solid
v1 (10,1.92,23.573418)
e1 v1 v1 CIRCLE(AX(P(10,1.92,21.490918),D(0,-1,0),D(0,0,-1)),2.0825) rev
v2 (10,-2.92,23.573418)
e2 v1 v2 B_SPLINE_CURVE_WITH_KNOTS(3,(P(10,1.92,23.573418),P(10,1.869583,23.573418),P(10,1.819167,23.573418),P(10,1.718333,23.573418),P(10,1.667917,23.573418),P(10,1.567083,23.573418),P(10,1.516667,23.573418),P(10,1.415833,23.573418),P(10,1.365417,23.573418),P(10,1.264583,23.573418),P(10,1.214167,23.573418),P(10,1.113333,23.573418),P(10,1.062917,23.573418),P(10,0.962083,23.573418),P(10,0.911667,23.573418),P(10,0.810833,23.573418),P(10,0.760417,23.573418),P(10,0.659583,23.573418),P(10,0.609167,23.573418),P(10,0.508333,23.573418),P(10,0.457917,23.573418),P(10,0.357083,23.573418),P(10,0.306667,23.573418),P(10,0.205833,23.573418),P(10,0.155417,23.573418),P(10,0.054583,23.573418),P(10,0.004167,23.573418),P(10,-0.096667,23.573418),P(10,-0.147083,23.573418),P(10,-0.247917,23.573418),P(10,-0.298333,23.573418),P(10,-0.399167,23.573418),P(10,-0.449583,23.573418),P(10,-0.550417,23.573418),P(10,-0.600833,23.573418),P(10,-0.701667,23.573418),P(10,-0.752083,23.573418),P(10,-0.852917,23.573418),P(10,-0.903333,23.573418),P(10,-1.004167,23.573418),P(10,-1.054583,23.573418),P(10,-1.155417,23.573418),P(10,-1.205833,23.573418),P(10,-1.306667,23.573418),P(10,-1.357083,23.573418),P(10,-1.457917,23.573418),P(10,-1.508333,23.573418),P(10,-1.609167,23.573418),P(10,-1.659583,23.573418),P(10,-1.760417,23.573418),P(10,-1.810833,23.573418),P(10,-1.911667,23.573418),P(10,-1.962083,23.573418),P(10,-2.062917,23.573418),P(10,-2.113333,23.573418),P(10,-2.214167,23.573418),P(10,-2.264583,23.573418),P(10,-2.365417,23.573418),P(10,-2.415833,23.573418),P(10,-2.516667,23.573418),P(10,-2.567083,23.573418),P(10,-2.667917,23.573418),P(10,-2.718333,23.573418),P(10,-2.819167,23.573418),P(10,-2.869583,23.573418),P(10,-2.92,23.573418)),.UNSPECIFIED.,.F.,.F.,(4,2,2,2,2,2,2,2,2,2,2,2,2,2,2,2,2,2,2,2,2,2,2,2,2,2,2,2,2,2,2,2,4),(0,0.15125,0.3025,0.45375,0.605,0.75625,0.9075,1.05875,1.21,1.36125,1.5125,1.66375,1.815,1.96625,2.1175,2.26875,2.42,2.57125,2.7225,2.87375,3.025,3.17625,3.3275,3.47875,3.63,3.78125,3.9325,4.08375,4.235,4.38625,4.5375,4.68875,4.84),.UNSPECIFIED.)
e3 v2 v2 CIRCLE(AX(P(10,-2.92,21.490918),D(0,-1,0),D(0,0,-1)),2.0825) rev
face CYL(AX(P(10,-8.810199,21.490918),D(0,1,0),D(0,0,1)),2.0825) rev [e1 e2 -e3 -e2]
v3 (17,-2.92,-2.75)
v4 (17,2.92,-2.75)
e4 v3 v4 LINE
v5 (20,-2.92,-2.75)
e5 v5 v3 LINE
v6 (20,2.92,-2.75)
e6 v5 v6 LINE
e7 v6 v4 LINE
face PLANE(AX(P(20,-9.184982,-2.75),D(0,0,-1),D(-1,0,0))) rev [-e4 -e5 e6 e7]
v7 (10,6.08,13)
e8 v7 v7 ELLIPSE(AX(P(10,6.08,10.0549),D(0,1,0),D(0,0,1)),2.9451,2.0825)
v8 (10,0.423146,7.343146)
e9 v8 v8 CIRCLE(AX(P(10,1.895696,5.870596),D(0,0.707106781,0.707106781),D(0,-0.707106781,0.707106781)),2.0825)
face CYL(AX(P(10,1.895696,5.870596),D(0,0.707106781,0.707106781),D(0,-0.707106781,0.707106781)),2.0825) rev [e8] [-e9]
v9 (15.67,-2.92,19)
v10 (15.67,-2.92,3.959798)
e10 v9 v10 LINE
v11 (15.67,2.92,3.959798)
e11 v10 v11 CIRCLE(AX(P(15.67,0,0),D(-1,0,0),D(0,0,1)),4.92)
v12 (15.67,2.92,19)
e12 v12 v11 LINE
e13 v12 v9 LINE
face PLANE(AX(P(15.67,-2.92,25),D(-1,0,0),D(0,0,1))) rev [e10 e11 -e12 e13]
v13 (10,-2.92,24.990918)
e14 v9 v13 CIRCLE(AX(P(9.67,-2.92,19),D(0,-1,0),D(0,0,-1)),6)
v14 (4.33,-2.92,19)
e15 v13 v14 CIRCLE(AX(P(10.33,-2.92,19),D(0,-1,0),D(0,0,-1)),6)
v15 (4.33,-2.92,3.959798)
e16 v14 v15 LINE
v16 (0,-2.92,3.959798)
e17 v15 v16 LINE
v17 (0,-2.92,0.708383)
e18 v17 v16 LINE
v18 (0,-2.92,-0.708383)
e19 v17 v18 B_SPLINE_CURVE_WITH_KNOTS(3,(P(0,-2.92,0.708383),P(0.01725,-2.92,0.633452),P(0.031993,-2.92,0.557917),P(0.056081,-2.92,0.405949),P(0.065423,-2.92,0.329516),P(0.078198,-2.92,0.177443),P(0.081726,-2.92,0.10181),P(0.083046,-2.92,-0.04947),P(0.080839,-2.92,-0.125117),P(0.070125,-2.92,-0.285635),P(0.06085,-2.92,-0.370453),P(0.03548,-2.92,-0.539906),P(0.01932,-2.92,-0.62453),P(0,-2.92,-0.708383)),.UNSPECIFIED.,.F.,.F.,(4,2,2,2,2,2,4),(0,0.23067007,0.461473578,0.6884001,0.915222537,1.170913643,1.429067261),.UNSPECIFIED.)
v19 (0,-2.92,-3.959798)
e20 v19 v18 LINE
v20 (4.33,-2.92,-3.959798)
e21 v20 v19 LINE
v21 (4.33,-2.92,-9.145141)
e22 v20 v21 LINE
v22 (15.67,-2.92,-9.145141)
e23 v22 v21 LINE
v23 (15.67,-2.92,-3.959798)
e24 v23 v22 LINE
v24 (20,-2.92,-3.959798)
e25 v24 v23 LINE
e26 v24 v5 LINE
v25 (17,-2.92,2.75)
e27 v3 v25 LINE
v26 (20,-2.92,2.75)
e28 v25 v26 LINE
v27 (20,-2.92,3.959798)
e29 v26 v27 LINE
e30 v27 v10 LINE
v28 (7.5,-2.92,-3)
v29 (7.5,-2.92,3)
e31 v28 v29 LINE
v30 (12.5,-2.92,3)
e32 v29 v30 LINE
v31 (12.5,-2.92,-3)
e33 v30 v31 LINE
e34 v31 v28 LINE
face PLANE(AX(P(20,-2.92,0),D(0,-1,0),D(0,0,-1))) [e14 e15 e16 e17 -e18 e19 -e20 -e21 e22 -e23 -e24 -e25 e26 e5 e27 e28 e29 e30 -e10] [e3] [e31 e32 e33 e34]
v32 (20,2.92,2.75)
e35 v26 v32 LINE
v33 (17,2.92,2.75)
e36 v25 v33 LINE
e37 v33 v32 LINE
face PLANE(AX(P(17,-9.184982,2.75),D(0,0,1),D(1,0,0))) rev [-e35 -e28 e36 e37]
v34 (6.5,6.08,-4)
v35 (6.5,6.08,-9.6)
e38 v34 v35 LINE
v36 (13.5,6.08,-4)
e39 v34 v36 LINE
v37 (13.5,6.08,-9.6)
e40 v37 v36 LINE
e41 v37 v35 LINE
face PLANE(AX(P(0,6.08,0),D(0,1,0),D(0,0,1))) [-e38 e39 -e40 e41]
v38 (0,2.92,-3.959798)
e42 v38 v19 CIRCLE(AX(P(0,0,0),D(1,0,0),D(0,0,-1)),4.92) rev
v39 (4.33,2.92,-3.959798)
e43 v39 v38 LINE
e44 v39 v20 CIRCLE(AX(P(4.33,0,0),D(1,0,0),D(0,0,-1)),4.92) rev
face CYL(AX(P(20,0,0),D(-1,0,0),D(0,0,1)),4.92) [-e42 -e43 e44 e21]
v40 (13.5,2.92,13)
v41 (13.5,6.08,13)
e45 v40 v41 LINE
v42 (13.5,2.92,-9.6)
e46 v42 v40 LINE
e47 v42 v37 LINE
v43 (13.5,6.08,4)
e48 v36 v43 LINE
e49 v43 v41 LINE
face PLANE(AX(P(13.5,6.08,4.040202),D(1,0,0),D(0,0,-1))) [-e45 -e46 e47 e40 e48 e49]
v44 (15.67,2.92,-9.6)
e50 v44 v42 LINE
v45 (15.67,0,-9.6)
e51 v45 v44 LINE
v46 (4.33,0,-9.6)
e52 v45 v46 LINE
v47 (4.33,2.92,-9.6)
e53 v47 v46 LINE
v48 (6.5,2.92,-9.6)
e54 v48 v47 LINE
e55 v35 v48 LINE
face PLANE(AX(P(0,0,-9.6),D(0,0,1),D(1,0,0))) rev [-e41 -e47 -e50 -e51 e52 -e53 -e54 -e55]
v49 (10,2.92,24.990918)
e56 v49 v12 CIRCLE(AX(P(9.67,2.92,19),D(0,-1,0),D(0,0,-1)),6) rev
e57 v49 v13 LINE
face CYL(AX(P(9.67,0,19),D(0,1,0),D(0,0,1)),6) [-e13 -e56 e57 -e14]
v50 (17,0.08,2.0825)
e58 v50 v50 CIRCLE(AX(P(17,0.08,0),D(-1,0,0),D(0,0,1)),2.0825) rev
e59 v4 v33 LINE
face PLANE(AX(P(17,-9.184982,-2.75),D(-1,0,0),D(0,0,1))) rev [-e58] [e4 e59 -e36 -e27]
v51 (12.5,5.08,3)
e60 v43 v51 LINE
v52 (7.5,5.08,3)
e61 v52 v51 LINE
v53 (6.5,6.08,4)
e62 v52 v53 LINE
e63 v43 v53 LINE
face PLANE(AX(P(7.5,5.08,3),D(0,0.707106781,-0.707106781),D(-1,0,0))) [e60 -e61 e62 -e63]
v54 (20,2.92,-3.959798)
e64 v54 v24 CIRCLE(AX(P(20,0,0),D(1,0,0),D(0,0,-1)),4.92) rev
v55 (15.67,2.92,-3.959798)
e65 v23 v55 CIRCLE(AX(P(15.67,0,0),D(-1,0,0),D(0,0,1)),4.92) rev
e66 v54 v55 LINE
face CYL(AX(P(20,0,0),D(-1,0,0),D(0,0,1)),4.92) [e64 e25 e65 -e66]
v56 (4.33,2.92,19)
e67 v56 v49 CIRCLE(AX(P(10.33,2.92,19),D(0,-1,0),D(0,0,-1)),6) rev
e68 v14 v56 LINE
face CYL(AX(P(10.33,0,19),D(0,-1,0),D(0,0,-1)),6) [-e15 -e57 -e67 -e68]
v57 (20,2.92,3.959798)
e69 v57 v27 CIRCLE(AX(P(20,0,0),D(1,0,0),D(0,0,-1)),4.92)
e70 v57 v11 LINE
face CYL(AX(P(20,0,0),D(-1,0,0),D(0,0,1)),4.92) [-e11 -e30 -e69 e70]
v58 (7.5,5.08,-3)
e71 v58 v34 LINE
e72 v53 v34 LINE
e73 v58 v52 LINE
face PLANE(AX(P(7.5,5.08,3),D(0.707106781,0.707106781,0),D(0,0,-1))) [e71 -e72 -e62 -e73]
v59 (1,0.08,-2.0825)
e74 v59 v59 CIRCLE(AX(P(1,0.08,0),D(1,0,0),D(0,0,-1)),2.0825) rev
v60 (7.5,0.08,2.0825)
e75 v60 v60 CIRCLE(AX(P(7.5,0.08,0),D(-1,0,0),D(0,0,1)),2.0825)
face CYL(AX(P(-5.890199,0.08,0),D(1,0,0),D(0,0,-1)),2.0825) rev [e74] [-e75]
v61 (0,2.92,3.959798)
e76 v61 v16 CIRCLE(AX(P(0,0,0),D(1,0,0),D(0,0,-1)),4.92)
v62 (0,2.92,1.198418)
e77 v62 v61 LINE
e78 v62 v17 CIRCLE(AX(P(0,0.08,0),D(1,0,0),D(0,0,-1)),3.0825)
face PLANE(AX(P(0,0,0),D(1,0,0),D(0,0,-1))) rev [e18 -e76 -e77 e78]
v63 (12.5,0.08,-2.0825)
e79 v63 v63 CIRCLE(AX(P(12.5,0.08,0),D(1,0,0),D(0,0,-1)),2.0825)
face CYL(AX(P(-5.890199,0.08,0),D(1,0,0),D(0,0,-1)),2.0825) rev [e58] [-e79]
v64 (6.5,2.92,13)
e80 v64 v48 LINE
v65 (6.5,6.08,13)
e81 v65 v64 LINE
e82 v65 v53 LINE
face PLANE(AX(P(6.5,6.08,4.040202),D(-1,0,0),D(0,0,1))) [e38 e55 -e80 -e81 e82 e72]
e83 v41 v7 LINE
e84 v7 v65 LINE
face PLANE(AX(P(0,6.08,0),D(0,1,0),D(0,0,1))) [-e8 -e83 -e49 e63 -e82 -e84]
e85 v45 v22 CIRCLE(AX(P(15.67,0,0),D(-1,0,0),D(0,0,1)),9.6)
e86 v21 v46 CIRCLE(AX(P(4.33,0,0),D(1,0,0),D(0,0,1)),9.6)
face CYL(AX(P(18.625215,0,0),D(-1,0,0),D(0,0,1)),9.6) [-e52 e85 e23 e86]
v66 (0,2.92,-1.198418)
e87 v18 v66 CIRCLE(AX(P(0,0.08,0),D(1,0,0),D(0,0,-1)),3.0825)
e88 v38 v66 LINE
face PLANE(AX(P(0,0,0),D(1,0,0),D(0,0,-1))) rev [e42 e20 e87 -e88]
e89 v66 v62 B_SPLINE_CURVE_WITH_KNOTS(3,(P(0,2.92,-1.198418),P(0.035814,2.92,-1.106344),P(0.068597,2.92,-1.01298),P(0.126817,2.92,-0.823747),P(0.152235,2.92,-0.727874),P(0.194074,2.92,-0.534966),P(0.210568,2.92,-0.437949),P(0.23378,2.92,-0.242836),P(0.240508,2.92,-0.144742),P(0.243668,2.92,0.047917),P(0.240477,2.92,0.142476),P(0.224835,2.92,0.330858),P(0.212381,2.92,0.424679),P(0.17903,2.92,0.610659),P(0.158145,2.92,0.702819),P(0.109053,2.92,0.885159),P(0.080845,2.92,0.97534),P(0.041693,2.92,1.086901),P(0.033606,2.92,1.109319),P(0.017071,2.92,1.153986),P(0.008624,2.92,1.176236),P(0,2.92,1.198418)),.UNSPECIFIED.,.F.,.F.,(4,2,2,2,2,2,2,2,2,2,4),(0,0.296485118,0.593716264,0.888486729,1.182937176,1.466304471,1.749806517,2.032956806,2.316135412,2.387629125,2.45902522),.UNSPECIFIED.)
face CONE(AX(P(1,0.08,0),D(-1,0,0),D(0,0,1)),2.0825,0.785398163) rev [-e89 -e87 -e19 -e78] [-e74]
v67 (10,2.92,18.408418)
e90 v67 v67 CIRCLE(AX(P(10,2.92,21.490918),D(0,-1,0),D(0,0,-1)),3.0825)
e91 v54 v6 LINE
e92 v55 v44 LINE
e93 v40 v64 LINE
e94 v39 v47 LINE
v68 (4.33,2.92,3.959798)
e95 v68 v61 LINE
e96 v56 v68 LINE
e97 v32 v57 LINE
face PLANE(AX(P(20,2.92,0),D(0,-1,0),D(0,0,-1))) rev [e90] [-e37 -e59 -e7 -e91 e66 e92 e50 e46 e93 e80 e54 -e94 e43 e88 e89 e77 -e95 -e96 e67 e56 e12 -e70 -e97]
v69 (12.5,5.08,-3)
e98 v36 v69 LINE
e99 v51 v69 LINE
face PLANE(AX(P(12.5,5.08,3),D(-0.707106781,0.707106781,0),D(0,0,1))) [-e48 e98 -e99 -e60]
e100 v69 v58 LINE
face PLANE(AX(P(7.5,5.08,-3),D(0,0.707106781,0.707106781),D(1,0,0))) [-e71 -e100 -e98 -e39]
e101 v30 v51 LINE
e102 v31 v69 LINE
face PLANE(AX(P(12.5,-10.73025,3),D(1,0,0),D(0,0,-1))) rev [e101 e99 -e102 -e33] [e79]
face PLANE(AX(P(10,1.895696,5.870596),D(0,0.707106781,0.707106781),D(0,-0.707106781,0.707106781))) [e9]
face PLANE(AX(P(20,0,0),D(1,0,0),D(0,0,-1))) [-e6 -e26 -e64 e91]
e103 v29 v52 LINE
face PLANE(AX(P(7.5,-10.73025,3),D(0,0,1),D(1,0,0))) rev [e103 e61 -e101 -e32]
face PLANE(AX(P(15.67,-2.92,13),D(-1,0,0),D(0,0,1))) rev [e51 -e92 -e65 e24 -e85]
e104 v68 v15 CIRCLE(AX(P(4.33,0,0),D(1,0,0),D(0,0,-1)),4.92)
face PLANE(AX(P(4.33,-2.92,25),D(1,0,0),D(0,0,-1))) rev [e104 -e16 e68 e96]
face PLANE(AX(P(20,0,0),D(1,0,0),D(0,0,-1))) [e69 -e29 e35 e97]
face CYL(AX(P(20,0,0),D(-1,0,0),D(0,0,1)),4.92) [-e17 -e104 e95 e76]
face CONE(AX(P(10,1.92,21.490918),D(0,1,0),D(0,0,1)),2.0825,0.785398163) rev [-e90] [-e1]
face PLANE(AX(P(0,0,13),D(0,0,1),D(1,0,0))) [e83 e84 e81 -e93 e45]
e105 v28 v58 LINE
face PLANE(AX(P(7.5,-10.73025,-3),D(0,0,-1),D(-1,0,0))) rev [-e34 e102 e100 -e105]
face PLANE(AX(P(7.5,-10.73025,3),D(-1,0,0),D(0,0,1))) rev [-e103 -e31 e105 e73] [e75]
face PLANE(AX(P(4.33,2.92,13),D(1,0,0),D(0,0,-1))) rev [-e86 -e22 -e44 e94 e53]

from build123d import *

# Parameters (mm, degrees)
BOSS_EXTRUDE1_DEPTH      = 20
SKETCH3_W                = 11.34
SKETCH3_H                = 5.84
BOSS_EXTRUDE2_DEPTH      = 25
FILLET1_R                = 6
SKETCH4_W                = 7
SKETCH4_H                = 8
BOSS_EXTRUDE3_DEPTH      = 9
BOSS_EXTRUDE4_DEPTH      = 13
BOSS_EXTRUDE4_DEPTH_BACK = 9.6
SKETCH5_W                = 5
SKETCH5_H                = 6
CUT_EXTRUDE1_DEPTH       = 9
SKETCH6_R                = 2.0825
CUT_EXTRUDE2_DEPTH       = 5.84
CUT_EXTRUDE3_REACH       = 34.581
SKETCH8_R                = 2.0825
SKETCH9_W                = 3
SKETCH9_H                = 5.5
CUT_EXTRUDE4_DEPTH       = 5.84
CUT_EXTRUDE5_DEPTH       = 11.34
SKETCH13_R               = 2.0825
CUT_EXTRUDE7_DEPTH       = 8


with BuildPart() as part:
    # Sketch2 → Boss-Extrude1 (new body)
    with BuildSketch(Plane(origin=(0, 0, 0), x_dir=(0, 0, -1), z_dir=(1, 0, 0))):
        with BuildLine():
            ThreePointArc((3.959797975, 2.92), (4.92, 0), (3.959797975, -2.92))
            Line((3.959797975, -2.92), (-3.959797975, -2.92))
            ThreePointArc((-3.959797975, -2.92), (-4.92, 0), (-3.959797975, 2.92))
            Line((-3.959797975, 2.92), (3.959797975, 2.92))
        make_face()
    extrude(amount=BOSS_EXTRUDE1_DEPTH)

    # Sketch3 → Boss-Extrude2 (add)
    with BuildSketch(Plane.XY):
        with Locations((10, 0)):
            Rectangle(SKETCH3_W, SKETCH3_H)
    extrude(amount=BOSS_EXTRUDE2_DEPTH)

    # Fillet1
    # the kernel refuses this fillet: 6 mm, written as the material it takes off along each edge
    with BuildSketch(Plane(origin=(15.67, -17.92, 25), x_dir=(0, 0, -1), z_dir=(0, 1, 0)), Plane(origin=(4.33, 17.92, 25), x_dir=(0, 0, -1), z_dir=(0, -1, 0))) as fillet1_piece_1:
        with BuildLine():
            CenterArc((FILLET1_R, FILLET1_R), FILLET1_R, 180, 90)
            Line((0, FILLET1_R), (0, 0))
            Line((0, 0), (FILLET1_R, 0))
        make_face()
    extrude(amount=35.84, mode=Mode.SUBTRACT)

    # Sketch4 → Boss-Extrude3 (add)
    with BuildSketch(Plane.XZ.offset(2.92)):
        with Locations((10, 0.040202025)):
            Rectangle(SKETCH4_W, SKETCH4_H)
    extrude(amount=-BOSS_EXTRUDE3_DEPTH)

    # Sketch10 → Boss-Extrude4 (add, two sides: drawn at the far end of the back side and taken through both)
    with BuildSketch(Plane.XY.offset(-BOSS_EXTRUDE4_DEPTH_BACK)):
        Polygon((10, -2.92), (15.67, -2.92), (15.67, 2.92), (13.5, 2.92), (13.5, 6.08), (6.5, 6.08), (6.5, 2.92), (4.33, 2.92), (4.33, -2.92), align=None)
    extrude(amount=BOSS_EXTRUDE4_DEPTH + BOSS_EXTRUDE4_DEPTH_BACK)

    # Sketch5 → Cut-Extrude1 (cut)
    with BuildSketch(Plane(origin=(0, 6.08, 0), x_dir=(1, 0, 0), z_dir=(0, 1, 0))):
        with Locations((10, 0)):
            Rectangle(SKETCH5_W, SKETCH5_H)
    extrude(amount=-CUT_EXTRUDE1_DEPTH, mode=Mode.SUBTRACT)

    # Sketch6 → Cut-Extrude2 (cut)
    with BuildSketch(Plane(origin=(0, 2.92, 0), x_dir=(1, 0, 0), z_dir=(0, 1, 0))):
        with Locations(Location((10, -21.490918127, 0), (0, 0, 270))):
            Circle(SKETCH6_R)
    extrude(amount=-CUT_EXTRUDE2_DEPTH, mode=Mode.SUBTRACT)

    # Cut-Extrude3: up to this face of the body (flat: up to its plane)
    cut_extrude3_end = Plane(part.part.faces().sort_by_distance((0, 0, 0))[0])
    # Sketch8 → Cut-Extrude3 (cut, up to the picked face)
    with BuildSketch(Plane(origin=(20, 0, 0), x_dir=(0, 0, -1), z_dir=(1, 0, 0)), mode=Mode.PRIVATE) as cut_extrude3_sk1:
        with Locations((0, 0.08)):
            Circle(SKETCH8_R)
    cut_extrude3_tool1 = split(extrude(cut_extrude3_sk1.sketch, amount=-CUT_EXTRUDE3_REACH, mode=Mode.PRIVATE), bisect_by=cut_extrude3_end, keep=Keep.BOTH, mode=Mode.PRIVATE)
    add(cut_extrude3_tool1.solids().sort_by(Axis((20, 0.08, 0), (-1, 0, 0)))[0], mode=Mode.SUBTRACT)

    # Sketch9 → Cut-Extrude4 (cut)
    with BuildSketch(Plane(origin=(0, 2.92, 0), x_dir=(1, 0, 0), z_dir=(0, 1, 0))):
        with Locations((18.5, 0)):
            Rectangle(SKETCH9_W, SKETCH9_H)
    extrude(amount=-CUT_EXTRUDE4_DEPTH, mode=Mode.SUBTRACT)

    # Chamfer1
    # the kernel refuses this chamfer: 1 mm, written as the material it takes off along each edge
    with BuildSketch(Plane(origin=(12.5, 6.08, 3), x_dir=(0.9996219169112968, 0.027495876610587375, 0), z_dir=(0, 0, -1)), Plane(origin=(7.5, 6.08, -3), x_dir=(-0.9996219169112968, 0.02749587661058735, 0), z_dir=(0, 0, 1))) as chamfer1_piece_1:
        with BuildLine():
            Line((1.028673195, 0), (-0.056547155, 1.027117794))
            Line((-0.056547155, 1.027117794), (-0.076539593, 1.026567876))
            ThreePointArc((-0.076539593, 1.026567876), (-0.034129227, 0.51339783), (-0.019992438, -0.000549918))
            Line((-0.019992438, -0.000549918), (0.000549918, -0.019992438))
            ThreePointArc((0.000549918, -0.019992438), (0.514497665, -0.00585565), (1.029223113, -0.019992438))
            Line((1.029223113, -0.019992438), (1.028673195, 0))
        make_face()
    extrude(amount=6, mode=Mode.SUBTRACT)
    with BuildSketch(Plane(origin=(12.5, 6.08, -3), x_dir=(0, 0.02749587661058736, -0.9996219169112968), z_dir=(-1, 0, 0)), Plane(origin=(7.5, 6.08, 3), x_dir=(0, 0.02749587661058736, 0.9996219169112968), z_dir=(1, 0, 0))) as chamfer1_piece_2:
        with BuildLine():
            Line((1.028673195, 0), (-0.056547155, 1.027117794))
            Line((-0.056547155, 1.027117794), (-0.076539593, 1.026567876))
            ThreePointArc((-0.076539593, 1.026567876), (-0.034129227, 0.51339783), (-0.019992438, -0.000549918))
            Line((-0.019992438, -0.000549918), (0.000549918, -0.019992438))
            ThreePointArc((0.000549918, -0.019992438), (0.514497665, -0.00585565), (1.029223113, -0.019992438))
            Line((1.029223113, -0.019992438), (1.028673195, 0))
        make_face()
    extrude(amount=5, mode=Mode.SUBTRACT)
    with BuildSketch(Plane(origin=(10, 2.92, 21.490918127), x_dir=(0, 0, 1), z_dir=(-1, 0, 0))) as chamfer1_piece_3:
        with BuildLine():
            Line((3.110784271, 0.028284271), (2.054215729, -1.028284271))
            Line((2.054215729, -1.028284271), (2.034215729, -1.028284271))
            ThreePointArc((2.034215729, -1.028284271), (2.0625, -0.514142136), (2.0625, 0))
            Line((2.0625, 0), (2.0825, 0.02))
            ThreePointArc((2.0825, 0.02), (2.596642136, 0.02), (3.110784271, 0.048284271))
            Line((3.110784271, 0.048284271), (3.110784271, 0.028284271))
        make_face()
    revolve(axis=Axis((10, 2.92, 21.490918127), (0, 1, 0)), mode=Mode.SUBTRACT)
    with BuildSketch(Plane(origin=(0, 0.08, 0), x_dir=(0, 0, -1), z_dir=(0, -1, 0))) as chamfer1_piece_4:
        with BuildLine():
            Line((3.110784271, -0.028284271), (2.054215729, 1.028284271))
            Line((2.054215729, 1.028284271), (2.034215729, 1.028284271))
            ThreePointArc((2.034215729, 1.028284271), (2.0625, 0.514142136), (2.0625, 0))
            Line((2.0625, 0), (2.0825, -0.02))
            ThreePointArc((2.0825, -0.02), (2.596642136, -0.02), (3.110784271, -0.048284271))
            Line((3.110784271, -0.048284271), (3.110784271, -0.028284271))
        make_face()
    revolve(axis=Axis((0, 0.08, 0), (1, 0, 0)), mode=Mode.SUBTRACT)
    with BuildSketch(Plane(origin=(12.5, 6.08, 5.571682988), x_dir=(0.9996219169112968, 0.02749587661058651, 0), z_dir=(0, 0, -1))) as chamfer1_piece_5a_section:
        with BuildLine():
            Line((1.028673195, 0), (-0.056547155, 1.027117794))
            Line((-0.056547155, 1.027117794), (-0.076539593, 1.026567876))
            ThreePointArc((-0.076539593, 1.026567876), (-0.034129227, 0.51339783), (-0.019992438, -0.000549918))
            Line((-0.019992438, -0.000549918), (0.000549918, -0.019992438))
            ThreePointArc((0.000549918, -0.019992438), (0.514497665, -0.00585565), (1.029223113, -0.019992438))
            Line((1.029223113, -0.019992438), (1.028673195, 0))
        make_face()
    chamfer1_piece_5a = extrude(amount=8.571682988, mode=Mode.PRIVATE)
    chamfer1_piece_5a = split(chamfer1_piece_5a, bisect_by=Plane(origin=(12.829793627, 5.750206373, 3), z_dir=(0, 0, 1)), keep=Keep.TOP, mode=Mode.PRIVATE)
    with BuildSketch(Plane(origin=(7.5, 6.08, 3), x_dir=(0, 0.02749587661058736, 0.9996219169112968), z_dir=(1, 0, 0))) as chamfer1_piece_5b_section:
        with BuildLine():
            Line((1.028673195, 0), (-0.056547155, 1.027117794))
            Line((-0.056547155, 1.027117794), (-0.076539593, 1.026567876))
            ThreePointArc((-0.076539593, 1.026567876), (-0.034129227, 0.51339783), (-0.019992438, -0.000549918))
            Line((-0.019992438, -0.000549918), (0.000549918, -0.019992438))
            ThreePointArc((0.000549918, -0.019992438), (0.514497665, -0.00585565), (1.029223113, -0.019992438))
            Line((1.029223113, -0.019992438), (1.028673195, 0))
        make_face()
    chamfer1_piece_5b = extrude(amount=7.571682988, mode=Mode.PRIVATE)
    chamfer1_piece_5b = split(chamfer1_piece_5b, bisect_by=Plane(origin=(12.5, 5.750206373, 3.329793627), z_dir=(1, 0, 0)), keep=Keep.TOP, mode=Mode.PRIVATE)
    chamfer1_piece_5 = chamfer1_piece_5a & chamfer1_piece_5b
    add(chamfer1_piece_5, mode=Mode.SUBTRACT)
    with BuildSketch(Plane(origin=(15.071682988, 6.08, -3), x_dir=(0, 0.027495876610586497, -0.9996219169112968), z_dir=(-1, 0, 0))) as chamfer1_piece_6a_section:
        with BuildLine():
            Line((1.028673195, 0), (-0.056547155, 1.027117794))
            Line((-0.056547155, 1.027117794), (-0.076539593, 1.026567876))
            ThreePointArc((-0.076539593, 1.026567876), (-0.034129227, 0.51339783), (-0.019992438, -0.000549918))
            Line((-0.019992438, -0.000549918), (0.000549918, -0.019992438))
            ThreePointArc((0.000549918, -0.019992438), (0.514497665, -0.00585565), (1.029223113, -0.019992438))
            Line((1.029223113, -0.019992438), (1.028673195, 0))
        make_face()
    chamfer1_piece_6a = extrude(amount=7.571682988, mode=Mode.PRIVATE)
    chamfer1_piece_6a = split(chamfer1_piece_6a, bisect_by=Plane(origin=(12.5, 5.750206373, -3.329793627), z_dir=(1, 0, 0)), keep=Keep.TOP, mode=Mode.PRIVATE)
    with BuildSketch(Plane(origin=(12.5, 6.08, 3), x_dir=(0.9996219169112968, 0.027495876610587375, 0), z_dir=(0, 0, -1))) as chamfer1_piece_6b_section:
        with BuildLine():
            Line((1.028673195, 0), (-0.056547155, 1.027117794))
            Line((-0.056547155, 1.027117794), (-0.076539593, 1.026567876))
            ThreePointArc((-0.076539593, 1.026567876), (-0.034129227, 0.51339783), (-0.019992438, -0.000549918))
            Line((-0.019992438, -0.000549918), (0.000549918, -0.019992438))
            ThreePointArc((0.000549918, -0.019992438), (0.514497665, -0.00585565), (1.029223113, -0.019992438))
            Line((1.029223113, -0.019992438), (1.028673195, 0))
        make_face()
    chamfer1_piece_6b = extrude(amount=8.571682988, mode=Mode.PRIVATE)
    chamfer1_piece_6b = split(chamfer1_piece_6b, bisect_by=Plane(origin=(12.829793627, 5.750206373, -3), z_dir=(0, 0, -1)), keep=Keep.TOP, mode=Mode.PRIVATE)
    chamfer1_piece_6 = chamfer1_piece_6a & chamfer1_piece_6b
    add(chamfer1_piece_6, mode=Mode.SUBTRACT)
    with BuildSketch(Plane(origin=(7.5, 6.08, -5.571682988), x_dir=(-0.9996219169112968, 0.027495876610586487, 0), z_dir=(0, 0, 1))) as chamfer1_piece_7a_section:
        with BuildLine():
            Line((1.028673195, 0), (-0.056547155, 1.027117794))
            Line((-0.056547155, 1.027117794), (-0.076539593, 1.026567876))
            ThreePointArc((-0.076539593, 1.026567876), (-0.034129227, 0.51339783), (-0.019992438, -0.000549918))
            Line((-0.019992438, -0.000549918), (0.000549918, -0.019992438))
            ThreePointArc((0.000549918, -0.019992438), (0.514497665, -0.00585565), (1.029223113, -0.019992438))
            Line((1.029223113, -0.019992438), (1.028673195, 0))
        make_face()
    chamfer1_piece_7a = extrude(amount=8.571682988, mode=Mode.PRIVATE)
    chamfer1_piece_7a = split(chamfer1_piece_7a, bisect_by=Plane(origin=(7.170206373, 5.750206373, -3), z_dir=(0, 0, -1)), keep=Keep.TOP, mode=Mode.PRIVATE)
    with BuildSketch(Plane(origin=(12.5, 6.08, -3), x_dir=(0, 0.02749587661058736, -0.9996219169112968), z_dir=(-1, 0, 0))) as chamfer1_piece_7b_section:
        with BuildLine():
            Line((1.028673195, 0), (-0.056547155, 1.027117794))
            Line((-0.056547155, 1.027117794), (-0.076539593, 1.026567876))
            ThreePointArc((-0.076539593, 1.026567876), (-0.034129227, 0.51339783), (-0.019992438, -0.000549918))
            Line((-0.019992438, -0.000549918), (0.000549918, -0.019992438))
            ThreePointArc((0.000549918, -0.019992438), (0.514497665, -0.00585565), (1.029223113, -0.019992438))
            Line((1.029223113, -0.019992438), (1.028673195, 0))
        make_face()
    chamfer1_piece_7b = extrude(amount=7.571682988, mode=Mode.PRIVATE)
    chamfer1_piece_7b = split(chamfer1_piece_7b, bisect_by=Plane(origin=(7.5, 5.750206373, -3.329793627), z_dir=(-1, 0, 0)), keep=Keep.TOP, mode=Mode.PRIVATE)
    chamfer1_piece_7 = chamfer1_piece_7a & chamfer1_piece_7b
    add(chamfer1_piece_7, mode=Mode.SUBTRACT)
    with BuildSketch(Plane(origin=(7.5, 6.08, -3), x_dir=(-0.9996219169112968, 0.02749587661058735, 0), z_dir=(0, 0, 1))) as chamfer1_piece_8a_section:
        with BuildLine():
            Line((1.028673195, 0), (-0.056547155, 1.027117794))
            Line((-0.056547155, 1.027117794), (-0.076539593, 1.026567876))
            ThreePointArc((-0.076539593, 1.026567876), (-0.034129227, 0.51339783), (-0.019992438, -0.000549918))
            Line((-0.019992438, -0.000549918), (0.000549918, -0.019992438))
            ThreePointArc((0.000549918, -0.019992438), (0.514497665, -0.00585565), (1.029223113, -0.019992438))
            Line((1.029223113, -0.019992438), (1.028673195, 0))
        make_face()
    chamfer1_piece_8a = extrude(amount=8.571682988, mode=Mode.PRIVATE)
    chamfer1_piece_8a = split(chamfer1_piece_8a, bisect_by=Plane(origin=(7.170206373, 5.750206373, 3), z_dir=(0, 0, 1)), keep=Keep.TOP, mode=Mode.PRIVATE)
    with BuildSketch(Plane(origin=(4.928317012, 6.08, 3), x_dir=(0, 0.027495876610586497, 0.9996219169112968), z_dir=(1, 0, 0))) as chamfer1_piece_8b_section:
        with BuildLine():
            Line((1.028673195, 0), (-0.056547155, 1.027117794))
            Line((-0.056547155, 1.027117794), (-0.076539593, 1.026567876))
            ThreePointArc((-0.076539593, 1.026567876), (-0.034129227, 0.51339783), (-0.019992438, -0.000549918))
            Line((-0.019992438, -0.000549918), (0.000549918, -0.019992438))
            ThreePointArc((0.000549918, -0.019992438), (0.514497665, -0.00585565), (1.029223113, -0.019992438))
            Line((1.029223113, -0.019992438), (1.028673195, 0))
        make_face()
    chamfer1_piece_8b = extrude(amount=7.571682988, mode=Mode.PRIVATE)
    chamfer1_piece_8b = split(chamfer1_piece_8b, bisect_by=Plane(origin=(7.5, 5.750206373, 3.329793627), z_dir=(-1, 0, 0)), keep=Keep.TOP, mode=Mode.PRIVATE)
    chamfer1_piece_8 = chamfer1_piece_8a & chamfer1_piece_8b
    add(chamfer1_piece_8, mode=Mode.SUBTRACT)

    # Sketch11 → Cut-Extrude5 (cut)
    with BuildSketch(Plane.ZY.offset(-4.33)):
        with BuildLine():
            Line((-9.145140786, -2.92), (-9.6, -2.92))
            Line((-9.6, -2.92), (-9.6, 0))
            ThreePointArc((-9.6, 0), (-9.485603606, -1.477607602), (-9.145140786, -2.92))
        make_face()
    extrude(amount=-CUT_EXTRUDE5_DEPTH, mode=Mode.SUBTRACT)

    # Sketch13 → Cut-Extrude7 (cut)
    with BuildSketch(Plane(origin=(0, 9.54, 9.54), x_dir=(-1, 0, 0), z_dir=(0, 0.7071067811865464, 0.7071067811865488))):
        with Locations(Location((-10, 2.810678926, 0), (0, 0, 90))):
            Circle(SKETCH13_R)
    extrude(amount=-CUT_EXTRUDE7_DEPTH, mode=Mode.SUBTRACT)


solid = part.part
